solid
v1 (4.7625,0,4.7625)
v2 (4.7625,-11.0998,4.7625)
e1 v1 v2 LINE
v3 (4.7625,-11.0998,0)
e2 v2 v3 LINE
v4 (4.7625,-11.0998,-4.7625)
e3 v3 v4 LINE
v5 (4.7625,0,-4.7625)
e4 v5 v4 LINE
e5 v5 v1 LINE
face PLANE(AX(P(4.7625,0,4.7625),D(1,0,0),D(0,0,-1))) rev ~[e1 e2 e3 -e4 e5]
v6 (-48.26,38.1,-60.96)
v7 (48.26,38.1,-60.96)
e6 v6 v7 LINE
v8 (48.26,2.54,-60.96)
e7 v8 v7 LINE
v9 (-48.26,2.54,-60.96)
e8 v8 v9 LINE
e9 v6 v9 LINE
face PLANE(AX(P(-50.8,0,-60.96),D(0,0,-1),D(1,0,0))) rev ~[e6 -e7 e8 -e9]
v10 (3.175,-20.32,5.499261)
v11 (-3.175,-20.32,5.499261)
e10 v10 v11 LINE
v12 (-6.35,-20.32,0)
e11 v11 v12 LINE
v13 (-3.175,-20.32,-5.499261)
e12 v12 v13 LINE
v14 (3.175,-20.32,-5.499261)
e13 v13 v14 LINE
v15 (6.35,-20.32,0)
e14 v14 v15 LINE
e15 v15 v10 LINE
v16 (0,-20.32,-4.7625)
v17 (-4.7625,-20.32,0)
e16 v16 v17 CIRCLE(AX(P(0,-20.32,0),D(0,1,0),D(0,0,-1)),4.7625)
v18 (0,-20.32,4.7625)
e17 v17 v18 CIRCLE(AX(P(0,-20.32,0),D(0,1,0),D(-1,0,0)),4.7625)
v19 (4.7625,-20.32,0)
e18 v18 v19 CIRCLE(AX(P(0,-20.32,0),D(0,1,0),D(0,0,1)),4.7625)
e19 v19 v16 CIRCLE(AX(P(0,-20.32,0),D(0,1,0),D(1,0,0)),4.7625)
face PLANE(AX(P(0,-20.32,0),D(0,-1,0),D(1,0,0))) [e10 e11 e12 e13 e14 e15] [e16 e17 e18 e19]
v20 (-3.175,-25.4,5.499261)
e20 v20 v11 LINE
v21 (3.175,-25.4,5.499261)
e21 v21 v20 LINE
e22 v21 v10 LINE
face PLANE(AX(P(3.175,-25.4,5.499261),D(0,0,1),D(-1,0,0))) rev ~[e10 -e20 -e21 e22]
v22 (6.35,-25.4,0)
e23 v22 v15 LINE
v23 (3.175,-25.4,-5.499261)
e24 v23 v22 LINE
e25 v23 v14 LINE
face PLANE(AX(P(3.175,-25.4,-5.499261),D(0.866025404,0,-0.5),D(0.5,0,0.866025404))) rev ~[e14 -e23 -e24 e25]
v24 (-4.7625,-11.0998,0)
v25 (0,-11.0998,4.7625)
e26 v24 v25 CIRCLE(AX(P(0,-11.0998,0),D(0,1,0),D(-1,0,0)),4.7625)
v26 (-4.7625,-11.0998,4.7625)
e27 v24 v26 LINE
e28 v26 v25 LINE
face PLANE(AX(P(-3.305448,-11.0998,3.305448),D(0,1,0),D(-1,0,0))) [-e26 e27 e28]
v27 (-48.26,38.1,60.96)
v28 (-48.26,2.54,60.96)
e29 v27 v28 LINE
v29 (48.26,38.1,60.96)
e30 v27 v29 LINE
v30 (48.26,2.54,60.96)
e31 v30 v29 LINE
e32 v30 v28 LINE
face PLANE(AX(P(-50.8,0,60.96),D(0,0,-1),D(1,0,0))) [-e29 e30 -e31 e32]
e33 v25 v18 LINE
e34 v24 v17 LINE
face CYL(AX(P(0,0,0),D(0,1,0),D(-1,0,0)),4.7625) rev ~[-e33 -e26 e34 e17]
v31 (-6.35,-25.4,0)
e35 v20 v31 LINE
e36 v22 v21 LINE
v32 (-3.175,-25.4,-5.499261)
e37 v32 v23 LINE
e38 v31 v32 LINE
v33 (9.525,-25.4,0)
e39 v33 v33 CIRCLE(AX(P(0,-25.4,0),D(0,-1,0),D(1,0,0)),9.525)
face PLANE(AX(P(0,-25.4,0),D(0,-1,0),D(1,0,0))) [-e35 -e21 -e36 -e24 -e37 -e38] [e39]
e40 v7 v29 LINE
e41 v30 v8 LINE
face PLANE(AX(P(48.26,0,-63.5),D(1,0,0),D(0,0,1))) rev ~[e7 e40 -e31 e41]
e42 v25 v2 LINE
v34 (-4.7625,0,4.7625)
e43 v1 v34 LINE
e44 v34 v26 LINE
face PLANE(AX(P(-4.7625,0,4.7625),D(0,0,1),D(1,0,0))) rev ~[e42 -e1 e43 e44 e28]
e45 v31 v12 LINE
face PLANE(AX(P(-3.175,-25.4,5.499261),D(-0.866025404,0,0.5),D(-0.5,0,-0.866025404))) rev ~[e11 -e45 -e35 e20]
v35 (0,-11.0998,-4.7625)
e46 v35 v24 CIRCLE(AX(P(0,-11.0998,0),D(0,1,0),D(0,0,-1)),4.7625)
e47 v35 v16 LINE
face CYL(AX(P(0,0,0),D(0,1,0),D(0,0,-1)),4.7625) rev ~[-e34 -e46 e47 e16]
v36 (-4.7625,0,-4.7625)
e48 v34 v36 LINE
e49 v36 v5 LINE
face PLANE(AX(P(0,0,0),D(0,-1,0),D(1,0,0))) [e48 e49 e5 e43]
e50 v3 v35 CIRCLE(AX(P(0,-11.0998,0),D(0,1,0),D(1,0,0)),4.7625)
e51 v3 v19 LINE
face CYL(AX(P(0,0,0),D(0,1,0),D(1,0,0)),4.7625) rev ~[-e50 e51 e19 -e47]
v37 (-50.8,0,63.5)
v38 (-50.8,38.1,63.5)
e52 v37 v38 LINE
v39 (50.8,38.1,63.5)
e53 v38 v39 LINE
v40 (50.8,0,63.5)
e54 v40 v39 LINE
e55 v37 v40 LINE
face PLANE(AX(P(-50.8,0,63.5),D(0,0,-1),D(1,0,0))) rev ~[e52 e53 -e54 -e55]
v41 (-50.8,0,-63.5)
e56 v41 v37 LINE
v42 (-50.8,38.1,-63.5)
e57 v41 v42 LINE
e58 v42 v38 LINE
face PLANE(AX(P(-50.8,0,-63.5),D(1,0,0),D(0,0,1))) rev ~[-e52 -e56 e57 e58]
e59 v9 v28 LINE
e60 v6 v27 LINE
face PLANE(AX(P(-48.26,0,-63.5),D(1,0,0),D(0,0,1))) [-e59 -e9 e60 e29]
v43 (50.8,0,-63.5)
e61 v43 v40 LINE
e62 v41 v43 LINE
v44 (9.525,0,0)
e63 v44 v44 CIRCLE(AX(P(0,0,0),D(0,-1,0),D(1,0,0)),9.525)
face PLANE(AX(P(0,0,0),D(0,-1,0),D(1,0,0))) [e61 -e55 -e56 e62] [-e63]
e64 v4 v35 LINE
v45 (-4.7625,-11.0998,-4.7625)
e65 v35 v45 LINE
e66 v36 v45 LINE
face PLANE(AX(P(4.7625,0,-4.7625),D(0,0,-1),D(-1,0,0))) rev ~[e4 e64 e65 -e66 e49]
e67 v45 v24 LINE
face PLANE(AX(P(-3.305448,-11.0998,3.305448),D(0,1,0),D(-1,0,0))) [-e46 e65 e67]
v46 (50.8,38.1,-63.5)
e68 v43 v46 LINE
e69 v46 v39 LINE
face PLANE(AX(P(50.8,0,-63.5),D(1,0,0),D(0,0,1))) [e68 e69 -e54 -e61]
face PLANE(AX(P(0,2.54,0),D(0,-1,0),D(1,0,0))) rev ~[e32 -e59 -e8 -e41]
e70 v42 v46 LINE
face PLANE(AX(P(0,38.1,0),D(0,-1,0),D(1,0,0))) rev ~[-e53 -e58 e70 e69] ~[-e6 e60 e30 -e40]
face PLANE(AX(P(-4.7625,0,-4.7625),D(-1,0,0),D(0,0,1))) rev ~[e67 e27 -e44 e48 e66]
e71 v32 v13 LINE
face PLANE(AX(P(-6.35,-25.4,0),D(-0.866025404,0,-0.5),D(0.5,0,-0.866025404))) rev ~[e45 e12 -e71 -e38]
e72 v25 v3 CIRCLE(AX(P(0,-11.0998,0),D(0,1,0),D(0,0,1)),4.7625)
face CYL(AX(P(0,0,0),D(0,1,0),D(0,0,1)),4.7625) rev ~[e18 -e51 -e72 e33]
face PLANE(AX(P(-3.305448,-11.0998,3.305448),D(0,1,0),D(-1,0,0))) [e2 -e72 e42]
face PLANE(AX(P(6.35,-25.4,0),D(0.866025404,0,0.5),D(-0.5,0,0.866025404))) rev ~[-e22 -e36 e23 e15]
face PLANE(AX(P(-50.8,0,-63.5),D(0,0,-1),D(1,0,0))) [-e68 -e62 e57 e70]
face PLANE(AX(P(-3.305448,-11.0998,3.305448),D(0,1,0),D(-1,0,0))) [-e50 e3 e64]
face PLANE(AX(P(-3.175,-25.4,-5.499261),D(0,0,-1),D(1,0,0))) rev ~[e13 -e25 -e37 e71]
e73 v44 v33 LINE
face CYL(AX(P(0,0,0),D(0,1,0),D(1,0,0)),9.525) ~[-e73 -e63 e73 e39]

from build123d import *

# Parameters (mm, degrees)
F0_R         = 9.525
F1_DEPTH     = 25.4
F3_DEPTH     = 25.401
F4_DEPTH     = 11.0998
F6_DEPTH     = 5.08
F7_W         = 101.6
F7_H         = 127
F8_DEPTH     = 38.1
F9_T         = 2.54
F9_T3_DEPTH  = 10.16
F9_T5_DEPTH  = 11.43
F9_T7_DEPTH  = 11.43
F9_T9_DEPTH  = 11.43
F9_T11_DEPTH = 11.43
F9_T13_DEPTH = 11.43
F9_T15_DEPTH = 9.8425
F9_T17_DEPTH = 9.8425
F9_T19_DEPTH = 9.8425
F9_T21_DEPTH = 9.8425
F9_T23_DEPTH = 14.605
F9_T25_DEPTH = 16.1798
F9_T27_DEPTH = 14.605


# Not quite as in the source:
# - a shell that OpenCascade refuses in one call is made with other operations: the cavity is built on its own and cut out


with BuildPart() as f1:
    # F0 (on Front) → F1 (new body)
    with BuildSketch(Plane.XZ):
        Circle(F0_R)
    extrude(amount=F1_DEPTH)

    # F2 (on face) → F3 (cut, through all)
    with BuildSketch(Plane(origin=(0, 0, 0), x_dir=(-1, 0, 0), z_dir=(0, 1, 0))):
        with BuildLine():
            ThreePointArc((4.7625, 0), (3.3675960454, 3.3675960454), (0, 4.7625))
            ThreePointArc((0, 4.7625), (-3.3675960454, 3.3675960454), (-4.7625, 0))
            ThreePointArc((-4.7625, 0), (-3.3675960454, -3.3675960454), (0, -4.7625))
            ThreePointArc((0, -4.7625), (3.3675960454, -3.3675960454), (4.7625, 0))
        make_face()
    extrude(amount=-F3_DEPTH, mode=Mode.SUBTRACT)

    # F2 (on face) → F4 (cut)
    with BuildSketch(Plane(origin=(0, 0, 0), x_dir=(-1, 0, 0), z_dir=(0, 1, 0))):
        with BuildLine():
            Line((4.7625, 0), (4.7625, 4.7625))
            Line((4.7625, 4.7625), (0, 4.7625))
            ThreePointArc((0, 4.7625), (3.3675960454, 3.3675960454), (4.7625, 0))
        make_face()
        with BuildLine():
            ThreePointArc((-4.7625, 0), (-3.3675960454, 3.3675960454), (0, 4.7625))
            Line((0, 4.7625), (-4.7625, 4.7625))
            Line((-4.7625, 4.7625), (-4.7625, 0))
        make_face()
        with BuildLine():
            ThreePointArc((4.7625, 0), (3.3675960454, 3.3675960454), (0, 4.7625))
            ThreePointArc((0, 4.7625), (-3.3675960454, 3.3675960454), (-4.7625, 0))
            ThreePointArc((-4.7625, 0), (-3.3675960454, -3.3675960454), (0, -4.7625))
            ThreePointArc((0, -4.7625), (3.3675960454, -3.3675960454), (4.7625, 0))
        make_face()
        with BuildLine():
            Line((4.7625, -4.7625), (4.7625, 0))
            ThreePointArc((4.7625, 0), (3.3675960454, -3.3675960454), (0, -4.7625))
            Line((0, -4.7625), (4.7625, -4.7625))
        make_face()
        with BuildLine():
            ThreePointArc((0, -4.7625), (-3.3675960454, -3.3675960454), (-4.7625, 0))
            Line((-4.7625, 0), (-4.7625, -4.7625))
            Line((-4.7625, -4.7625), (0, -4.7625))
        make_face()
    extrude(amount=-F4_DEPTH, mode=Mode.SUBTRACT)

    # F5 (on face) → F6 (cut)
    with BuildSketch(Plane.XZ.offset(25.4)):
        Polygon((3.175, 5.499261314), (-3.175, 5.499261314), (-6.35, 0), (-3.175, -5.499261314), (3.175, -5.499261314), (6.35, 0), align=None)
    extrude(amount=-F6_DEPTH, mode=Mode.SUBTRACT)

    # F7 (on Front) → F8 (join)
    with BuildSketch(Plane.XZ):
        Rectangle(F7_W, F7_H)
    extrude(amount=-F8_DEPTH)

    # F9: shell of thickness 2.54, made by hand


with BuildPart() as f9_core1:
    # F9_t2: copy of F1
    add(f1.part)

    # the walls: a layer under each face that stays
    f9_faces = [f9_core1.faces().sort_by_distance(p)[0] for p in [
        (50.8, 19.05, 0),
        (0, 19.05, -63.5),
        (0, 19.05, 63.5),
        (-33.8666666667, 0, -42.3333333333),
        (-50.8, 19.05, 0),
        (-9.525, -12.7, 0),
        (-6.35, -25.4, -6.35),
        (0, -22.86, 5.499261314),
        (-4.7625, -22.86, 2.749630657),
        (-4.7625, -22.86, -2.749630657),
        (0, -22.86, -5.499261314),
        (4.7625, -22.86, -2.749630657),
        (4.7625, -22.86, 2.749630657),
        (-5.4428571429, -20.32, 0),
        (0, -15.7099, 4.7625),
        (-3.96875, -11.0998, -3.96875),
        (-3.96875, -11.0998, 3.96875),
        (3.96875, -11.0998, 3.96875),
        (3.96875, -11.0998, -3.96875),
        (-4.7625, -5.5499, 0),
        (0, -5.5499, -4.7625),
        (0, -5.5499, 4.7625),
        (4.7625, -5.5499, 0),
        (0, 0, 0),
    ]]
    thicken(f9_faces, amount=-F9_T, mode=Mode.SUBTRACT)

    # F9_s4 → F9_t3 (cut)
    with BuildSketch(Plane.XZ.offset(17.78)):
        Polygon((3.1530029547, 5.461161314), (3.175, 8.039261314), (4.6414696837, 8.039261314), (5.3747045256, 6.769261314), align=None)
        Polygon((-3.1530029547, 5.461161314), (-3.175, 8.039261314), (-4.6414696837, 8.039261314), (-5.3747045256, 6.769261314), align=None)
        Polygon((-6.3060059095, 0), (-8.5497045256, 1.27), (-9.2829393675, 0), (-8.5497045256, -1.27), align=None)
        Polygon((-3.1530029547, -5.461161314), (-5.3747045256, -6.769261314), (-4.6414696837, -8.039261314), (-3.175, -8.039261314), align=None)
        Polygon((3.1530029547, -5.461161314), (3.175, -8.039261314), (4.6414696837, -8.039261314), (5.3747045256, -6.769261314), align=None)
        Polygon((6.3060059095, 0), (8.5497045256, -1.27), (9.2829393675, 0), (8.5497045256, 1.27), align=None)
    extrude(amount=F9_T3_DEPTH, mode=Mode.SUBTRACT)

    # F9_s6 → F9_t5 (cut)
    with BuildSketch(Plane.YZ.offset(-5.715)):
        Polygon((-20.3454, 5.473861314), (-20.32, 8.039261314), (-17.78, 8.039261314), (-17.78, 5.499261314), align=None)
        Polygon((-20.3454, -5.473861314), (-20.32, -8.039261314), (-17.78, -8.039261314), (-17.78, -5.499261314), align=None)
    extrude(amount=F9_T5_DEPTH, mode=Mode.SUBTRACT)

    # F9_s8 → F9_t7 (cut)
    with BuildSketch(Plane(origin=(2.8575, 0, 4.9493351826), x_dir=(0, 1, 0), z_dir=(-0.5, 0, -0.8660254038))):
        Polygon((-20.3454, -5.473861314), (-20.32, -8.039261314), (-17.78, -8.039261314), (-17.78, -5.499261314), align=None)
    extrude(amount=F9_T7_DEPTH, mode=Mode.SUBTRACT)

    # F9_s10 → F9_t9 (cut)
    with BuildSketch(Plane(origin=(-2.8575, 0, 4.9493351826), x_dir=(0, 1, 0), z_dir=(0.5, 0, -0.8660254038))):
        Polygon((-20.3454, -5.473861314), (-20.32, -8.039261314), (-17.78, -8.039261314), (-17.78, -5.499261314), align=None)
    extrude(amount=F9_T9_DEPTH, mode=Mode.SUBTRACT)

    # F9_s12 → F9_t11 (cut)
    with BuildSketch(Plane(origin=(-2.8575, 0, -4.9493351826), x_dir=(0, 1, 0), z_dir=(0.5, 0, 0.8660254038))):
        Polygon((-20.3454, -5.473861314), (-20.32, -8.039261314), (-17.78, -8.039261314), (-17.78, -5.499261314), align=None)
    extrude(amount=F9_T11_DEPTH, mode=Mode.SUBTRACT)

    # F9_s14 → F9_t13 (cut)
    with BuildSketch(Plane(origin=(2.8575, 0, -4.9493351826), x_dir=(0, 1, 0), z_dir=(-0.5, 0, 0.8660254038))):
        Polygon((-20.3454, -5.473861314), (-20.32, -8.039261314), (-17.78, -8.039261314), (-17.78, -5.499261314), align=None)
    extrude(amount=F9_T13_DEPTH, mode=Mode.SUBTRACT)

    # F9_s16 → F9_t15 (cut)
    with BuildSketch(Plane.XY.offset(-7.3025)):
        Polygon((-4.7371, -11.0744), (-4.7625, -13.6398), (-7.3025, -13.6398), (-7.3025, -11.0998), align=None)
        Polygon((4.7371, -11.0744), (4.7625, -13.6398), (7.3025, -13.6398), (7.3025, -11.0998), align=None)
    extrude(amount=F9_T15_DEPTH, mode=Mode.SUBTRACT)

    # F9_s18 → F9_t17 (cut)
    with BuildSketch(Plane.YZ.offset(-7.3025)):
        Polygon((-11.0744, -4.7371), (-13.6398, -4.7625), (-13.6398, -7.3025), (-11.0998, -7.3025), align=None)
        Polygon((-11.0744, 4.7371), (-13.6398, 4.7625), (-13.6398, 7.3025), (-11.0998, 7.3025), align=None)
    extrude(amount=F9_T17_DEPTH, mode=Mode.SUBTRACT)

    # F9_s20 → F9_t19 (cut)
    with BuildSketch(Plane.XY.offset(-2.54)):
        Polygon((-4.7371, -11.0744), (-4.7625, -13.6398), (-7.3025, -13.6398), (-7.3025, -11.0998), align=None)
        Polygon((4.7371, -11.0744), (4.7625, -13.6398), (7.3025, -13.6398), (7.3025, -11.0998), align=None)
    extrude(amount=F9_T19_DEPTH, mode=Mode.SUBTRACT)

    # F9_s22 → F9_t21 (cut)
    with BuildSketch(Plane.YZ.offset(-2.54)):
        Polygon((-11.0744, 4.7371), (-13.6398, 4.7625), (-13.6398, 7.3025), (-11.0998, 7.3025), align=None)
        Polygon((-11.0744, -4.7371), (-13.6398, -4.7625), (-13.6398, -7.3025), (-11.0998, -7.3025), align=None)
    extrude(amount=F9_T21_DEPTH, mode=Mode.SUBTRACT)

    # F9_s24 → F9_t23 (cut)
    with BuildSketch(Plane.XY.offset(-7.3025)):
        Polygon((-4.7371, -0.0254), (-7.3025, 0), (-7.3025, 2.54), (-4.7625, 2.54), align=None)
        Polygon((4.7371, -0.0254), (7.3025, 0), (7.3025, 2.54), (4.7625, 2.54), align=None)
    extrude(amount=F9_T23_DEPTH, mode=Mode.SUBTRACT)

    # F9_s26 → F9_t25 (cut)
    with BuildSketch(Plane.XZ.offset(-2.54)):
        Polygon((-4.7371, -4.7371), (-7.3025, -4.7625), (-7.3025, -7.3025), (-4.7625, -7.3025), align=None)
        Polygon((-4.7371, 4.7371), (-7.3025, 4.7625), (-7.3025, 7.3025), (-4.7625, 7.3025), align=None)
        Polygon((4.7371, -4.7371), (4.7625, -7.3025), (7.3025, -7.3025), (7.3025, -4.7625), align=None)
        Polygon((4.7371, 4.7371), (4.7625, 7.3025), (7.3025, 7.3025), (7.3025, 4.7625), align=None)
    extrude(amount=F9_T25_DEPTH, mode=Mode.SUBTRACT)

    # F9_s28 → F9_t27 (cut)
    with BuildSketch(Plane.YZ.offset(-7.3025)):
        Polygon((-0.0254, -4.7371), (0, -7.3025), (2.54, -7.3025), (2.54, -4.7625), align=None)
        Polygon((-0.0254, 4.7371), (0, 7.3025), (2.54, 7.3025), (2.54, 4.7625), align=None)
    extrude(amount=F9_T27_DEPTH, mode=Mode.SUBTRACT)

    # F9_s29 → F9_t30 (revolve, cut)
    with BuildSketch(Plane.XY):
        Polygon((9.5504, -0.0254), (9.525, 2.54), (6.985, 2.54), (6.985, 0), align=None)
    revolve(axis=Axis((0, 0, 0), (0, -1, 0)), mode=Mode.SUBTRACT)


with BuildPart() as f1_1:
    add(f1.part)

    # what is left inside the walls is the cavity
    f9_cavity = [f9_core1.part.solids().sort_by_distance(p)[0] for p in [
        (0, 2.5654, -20.32),
    ]]
    add(f9_cavity, mode=Mode.SUBTRACT)


solid = f1_1.part
